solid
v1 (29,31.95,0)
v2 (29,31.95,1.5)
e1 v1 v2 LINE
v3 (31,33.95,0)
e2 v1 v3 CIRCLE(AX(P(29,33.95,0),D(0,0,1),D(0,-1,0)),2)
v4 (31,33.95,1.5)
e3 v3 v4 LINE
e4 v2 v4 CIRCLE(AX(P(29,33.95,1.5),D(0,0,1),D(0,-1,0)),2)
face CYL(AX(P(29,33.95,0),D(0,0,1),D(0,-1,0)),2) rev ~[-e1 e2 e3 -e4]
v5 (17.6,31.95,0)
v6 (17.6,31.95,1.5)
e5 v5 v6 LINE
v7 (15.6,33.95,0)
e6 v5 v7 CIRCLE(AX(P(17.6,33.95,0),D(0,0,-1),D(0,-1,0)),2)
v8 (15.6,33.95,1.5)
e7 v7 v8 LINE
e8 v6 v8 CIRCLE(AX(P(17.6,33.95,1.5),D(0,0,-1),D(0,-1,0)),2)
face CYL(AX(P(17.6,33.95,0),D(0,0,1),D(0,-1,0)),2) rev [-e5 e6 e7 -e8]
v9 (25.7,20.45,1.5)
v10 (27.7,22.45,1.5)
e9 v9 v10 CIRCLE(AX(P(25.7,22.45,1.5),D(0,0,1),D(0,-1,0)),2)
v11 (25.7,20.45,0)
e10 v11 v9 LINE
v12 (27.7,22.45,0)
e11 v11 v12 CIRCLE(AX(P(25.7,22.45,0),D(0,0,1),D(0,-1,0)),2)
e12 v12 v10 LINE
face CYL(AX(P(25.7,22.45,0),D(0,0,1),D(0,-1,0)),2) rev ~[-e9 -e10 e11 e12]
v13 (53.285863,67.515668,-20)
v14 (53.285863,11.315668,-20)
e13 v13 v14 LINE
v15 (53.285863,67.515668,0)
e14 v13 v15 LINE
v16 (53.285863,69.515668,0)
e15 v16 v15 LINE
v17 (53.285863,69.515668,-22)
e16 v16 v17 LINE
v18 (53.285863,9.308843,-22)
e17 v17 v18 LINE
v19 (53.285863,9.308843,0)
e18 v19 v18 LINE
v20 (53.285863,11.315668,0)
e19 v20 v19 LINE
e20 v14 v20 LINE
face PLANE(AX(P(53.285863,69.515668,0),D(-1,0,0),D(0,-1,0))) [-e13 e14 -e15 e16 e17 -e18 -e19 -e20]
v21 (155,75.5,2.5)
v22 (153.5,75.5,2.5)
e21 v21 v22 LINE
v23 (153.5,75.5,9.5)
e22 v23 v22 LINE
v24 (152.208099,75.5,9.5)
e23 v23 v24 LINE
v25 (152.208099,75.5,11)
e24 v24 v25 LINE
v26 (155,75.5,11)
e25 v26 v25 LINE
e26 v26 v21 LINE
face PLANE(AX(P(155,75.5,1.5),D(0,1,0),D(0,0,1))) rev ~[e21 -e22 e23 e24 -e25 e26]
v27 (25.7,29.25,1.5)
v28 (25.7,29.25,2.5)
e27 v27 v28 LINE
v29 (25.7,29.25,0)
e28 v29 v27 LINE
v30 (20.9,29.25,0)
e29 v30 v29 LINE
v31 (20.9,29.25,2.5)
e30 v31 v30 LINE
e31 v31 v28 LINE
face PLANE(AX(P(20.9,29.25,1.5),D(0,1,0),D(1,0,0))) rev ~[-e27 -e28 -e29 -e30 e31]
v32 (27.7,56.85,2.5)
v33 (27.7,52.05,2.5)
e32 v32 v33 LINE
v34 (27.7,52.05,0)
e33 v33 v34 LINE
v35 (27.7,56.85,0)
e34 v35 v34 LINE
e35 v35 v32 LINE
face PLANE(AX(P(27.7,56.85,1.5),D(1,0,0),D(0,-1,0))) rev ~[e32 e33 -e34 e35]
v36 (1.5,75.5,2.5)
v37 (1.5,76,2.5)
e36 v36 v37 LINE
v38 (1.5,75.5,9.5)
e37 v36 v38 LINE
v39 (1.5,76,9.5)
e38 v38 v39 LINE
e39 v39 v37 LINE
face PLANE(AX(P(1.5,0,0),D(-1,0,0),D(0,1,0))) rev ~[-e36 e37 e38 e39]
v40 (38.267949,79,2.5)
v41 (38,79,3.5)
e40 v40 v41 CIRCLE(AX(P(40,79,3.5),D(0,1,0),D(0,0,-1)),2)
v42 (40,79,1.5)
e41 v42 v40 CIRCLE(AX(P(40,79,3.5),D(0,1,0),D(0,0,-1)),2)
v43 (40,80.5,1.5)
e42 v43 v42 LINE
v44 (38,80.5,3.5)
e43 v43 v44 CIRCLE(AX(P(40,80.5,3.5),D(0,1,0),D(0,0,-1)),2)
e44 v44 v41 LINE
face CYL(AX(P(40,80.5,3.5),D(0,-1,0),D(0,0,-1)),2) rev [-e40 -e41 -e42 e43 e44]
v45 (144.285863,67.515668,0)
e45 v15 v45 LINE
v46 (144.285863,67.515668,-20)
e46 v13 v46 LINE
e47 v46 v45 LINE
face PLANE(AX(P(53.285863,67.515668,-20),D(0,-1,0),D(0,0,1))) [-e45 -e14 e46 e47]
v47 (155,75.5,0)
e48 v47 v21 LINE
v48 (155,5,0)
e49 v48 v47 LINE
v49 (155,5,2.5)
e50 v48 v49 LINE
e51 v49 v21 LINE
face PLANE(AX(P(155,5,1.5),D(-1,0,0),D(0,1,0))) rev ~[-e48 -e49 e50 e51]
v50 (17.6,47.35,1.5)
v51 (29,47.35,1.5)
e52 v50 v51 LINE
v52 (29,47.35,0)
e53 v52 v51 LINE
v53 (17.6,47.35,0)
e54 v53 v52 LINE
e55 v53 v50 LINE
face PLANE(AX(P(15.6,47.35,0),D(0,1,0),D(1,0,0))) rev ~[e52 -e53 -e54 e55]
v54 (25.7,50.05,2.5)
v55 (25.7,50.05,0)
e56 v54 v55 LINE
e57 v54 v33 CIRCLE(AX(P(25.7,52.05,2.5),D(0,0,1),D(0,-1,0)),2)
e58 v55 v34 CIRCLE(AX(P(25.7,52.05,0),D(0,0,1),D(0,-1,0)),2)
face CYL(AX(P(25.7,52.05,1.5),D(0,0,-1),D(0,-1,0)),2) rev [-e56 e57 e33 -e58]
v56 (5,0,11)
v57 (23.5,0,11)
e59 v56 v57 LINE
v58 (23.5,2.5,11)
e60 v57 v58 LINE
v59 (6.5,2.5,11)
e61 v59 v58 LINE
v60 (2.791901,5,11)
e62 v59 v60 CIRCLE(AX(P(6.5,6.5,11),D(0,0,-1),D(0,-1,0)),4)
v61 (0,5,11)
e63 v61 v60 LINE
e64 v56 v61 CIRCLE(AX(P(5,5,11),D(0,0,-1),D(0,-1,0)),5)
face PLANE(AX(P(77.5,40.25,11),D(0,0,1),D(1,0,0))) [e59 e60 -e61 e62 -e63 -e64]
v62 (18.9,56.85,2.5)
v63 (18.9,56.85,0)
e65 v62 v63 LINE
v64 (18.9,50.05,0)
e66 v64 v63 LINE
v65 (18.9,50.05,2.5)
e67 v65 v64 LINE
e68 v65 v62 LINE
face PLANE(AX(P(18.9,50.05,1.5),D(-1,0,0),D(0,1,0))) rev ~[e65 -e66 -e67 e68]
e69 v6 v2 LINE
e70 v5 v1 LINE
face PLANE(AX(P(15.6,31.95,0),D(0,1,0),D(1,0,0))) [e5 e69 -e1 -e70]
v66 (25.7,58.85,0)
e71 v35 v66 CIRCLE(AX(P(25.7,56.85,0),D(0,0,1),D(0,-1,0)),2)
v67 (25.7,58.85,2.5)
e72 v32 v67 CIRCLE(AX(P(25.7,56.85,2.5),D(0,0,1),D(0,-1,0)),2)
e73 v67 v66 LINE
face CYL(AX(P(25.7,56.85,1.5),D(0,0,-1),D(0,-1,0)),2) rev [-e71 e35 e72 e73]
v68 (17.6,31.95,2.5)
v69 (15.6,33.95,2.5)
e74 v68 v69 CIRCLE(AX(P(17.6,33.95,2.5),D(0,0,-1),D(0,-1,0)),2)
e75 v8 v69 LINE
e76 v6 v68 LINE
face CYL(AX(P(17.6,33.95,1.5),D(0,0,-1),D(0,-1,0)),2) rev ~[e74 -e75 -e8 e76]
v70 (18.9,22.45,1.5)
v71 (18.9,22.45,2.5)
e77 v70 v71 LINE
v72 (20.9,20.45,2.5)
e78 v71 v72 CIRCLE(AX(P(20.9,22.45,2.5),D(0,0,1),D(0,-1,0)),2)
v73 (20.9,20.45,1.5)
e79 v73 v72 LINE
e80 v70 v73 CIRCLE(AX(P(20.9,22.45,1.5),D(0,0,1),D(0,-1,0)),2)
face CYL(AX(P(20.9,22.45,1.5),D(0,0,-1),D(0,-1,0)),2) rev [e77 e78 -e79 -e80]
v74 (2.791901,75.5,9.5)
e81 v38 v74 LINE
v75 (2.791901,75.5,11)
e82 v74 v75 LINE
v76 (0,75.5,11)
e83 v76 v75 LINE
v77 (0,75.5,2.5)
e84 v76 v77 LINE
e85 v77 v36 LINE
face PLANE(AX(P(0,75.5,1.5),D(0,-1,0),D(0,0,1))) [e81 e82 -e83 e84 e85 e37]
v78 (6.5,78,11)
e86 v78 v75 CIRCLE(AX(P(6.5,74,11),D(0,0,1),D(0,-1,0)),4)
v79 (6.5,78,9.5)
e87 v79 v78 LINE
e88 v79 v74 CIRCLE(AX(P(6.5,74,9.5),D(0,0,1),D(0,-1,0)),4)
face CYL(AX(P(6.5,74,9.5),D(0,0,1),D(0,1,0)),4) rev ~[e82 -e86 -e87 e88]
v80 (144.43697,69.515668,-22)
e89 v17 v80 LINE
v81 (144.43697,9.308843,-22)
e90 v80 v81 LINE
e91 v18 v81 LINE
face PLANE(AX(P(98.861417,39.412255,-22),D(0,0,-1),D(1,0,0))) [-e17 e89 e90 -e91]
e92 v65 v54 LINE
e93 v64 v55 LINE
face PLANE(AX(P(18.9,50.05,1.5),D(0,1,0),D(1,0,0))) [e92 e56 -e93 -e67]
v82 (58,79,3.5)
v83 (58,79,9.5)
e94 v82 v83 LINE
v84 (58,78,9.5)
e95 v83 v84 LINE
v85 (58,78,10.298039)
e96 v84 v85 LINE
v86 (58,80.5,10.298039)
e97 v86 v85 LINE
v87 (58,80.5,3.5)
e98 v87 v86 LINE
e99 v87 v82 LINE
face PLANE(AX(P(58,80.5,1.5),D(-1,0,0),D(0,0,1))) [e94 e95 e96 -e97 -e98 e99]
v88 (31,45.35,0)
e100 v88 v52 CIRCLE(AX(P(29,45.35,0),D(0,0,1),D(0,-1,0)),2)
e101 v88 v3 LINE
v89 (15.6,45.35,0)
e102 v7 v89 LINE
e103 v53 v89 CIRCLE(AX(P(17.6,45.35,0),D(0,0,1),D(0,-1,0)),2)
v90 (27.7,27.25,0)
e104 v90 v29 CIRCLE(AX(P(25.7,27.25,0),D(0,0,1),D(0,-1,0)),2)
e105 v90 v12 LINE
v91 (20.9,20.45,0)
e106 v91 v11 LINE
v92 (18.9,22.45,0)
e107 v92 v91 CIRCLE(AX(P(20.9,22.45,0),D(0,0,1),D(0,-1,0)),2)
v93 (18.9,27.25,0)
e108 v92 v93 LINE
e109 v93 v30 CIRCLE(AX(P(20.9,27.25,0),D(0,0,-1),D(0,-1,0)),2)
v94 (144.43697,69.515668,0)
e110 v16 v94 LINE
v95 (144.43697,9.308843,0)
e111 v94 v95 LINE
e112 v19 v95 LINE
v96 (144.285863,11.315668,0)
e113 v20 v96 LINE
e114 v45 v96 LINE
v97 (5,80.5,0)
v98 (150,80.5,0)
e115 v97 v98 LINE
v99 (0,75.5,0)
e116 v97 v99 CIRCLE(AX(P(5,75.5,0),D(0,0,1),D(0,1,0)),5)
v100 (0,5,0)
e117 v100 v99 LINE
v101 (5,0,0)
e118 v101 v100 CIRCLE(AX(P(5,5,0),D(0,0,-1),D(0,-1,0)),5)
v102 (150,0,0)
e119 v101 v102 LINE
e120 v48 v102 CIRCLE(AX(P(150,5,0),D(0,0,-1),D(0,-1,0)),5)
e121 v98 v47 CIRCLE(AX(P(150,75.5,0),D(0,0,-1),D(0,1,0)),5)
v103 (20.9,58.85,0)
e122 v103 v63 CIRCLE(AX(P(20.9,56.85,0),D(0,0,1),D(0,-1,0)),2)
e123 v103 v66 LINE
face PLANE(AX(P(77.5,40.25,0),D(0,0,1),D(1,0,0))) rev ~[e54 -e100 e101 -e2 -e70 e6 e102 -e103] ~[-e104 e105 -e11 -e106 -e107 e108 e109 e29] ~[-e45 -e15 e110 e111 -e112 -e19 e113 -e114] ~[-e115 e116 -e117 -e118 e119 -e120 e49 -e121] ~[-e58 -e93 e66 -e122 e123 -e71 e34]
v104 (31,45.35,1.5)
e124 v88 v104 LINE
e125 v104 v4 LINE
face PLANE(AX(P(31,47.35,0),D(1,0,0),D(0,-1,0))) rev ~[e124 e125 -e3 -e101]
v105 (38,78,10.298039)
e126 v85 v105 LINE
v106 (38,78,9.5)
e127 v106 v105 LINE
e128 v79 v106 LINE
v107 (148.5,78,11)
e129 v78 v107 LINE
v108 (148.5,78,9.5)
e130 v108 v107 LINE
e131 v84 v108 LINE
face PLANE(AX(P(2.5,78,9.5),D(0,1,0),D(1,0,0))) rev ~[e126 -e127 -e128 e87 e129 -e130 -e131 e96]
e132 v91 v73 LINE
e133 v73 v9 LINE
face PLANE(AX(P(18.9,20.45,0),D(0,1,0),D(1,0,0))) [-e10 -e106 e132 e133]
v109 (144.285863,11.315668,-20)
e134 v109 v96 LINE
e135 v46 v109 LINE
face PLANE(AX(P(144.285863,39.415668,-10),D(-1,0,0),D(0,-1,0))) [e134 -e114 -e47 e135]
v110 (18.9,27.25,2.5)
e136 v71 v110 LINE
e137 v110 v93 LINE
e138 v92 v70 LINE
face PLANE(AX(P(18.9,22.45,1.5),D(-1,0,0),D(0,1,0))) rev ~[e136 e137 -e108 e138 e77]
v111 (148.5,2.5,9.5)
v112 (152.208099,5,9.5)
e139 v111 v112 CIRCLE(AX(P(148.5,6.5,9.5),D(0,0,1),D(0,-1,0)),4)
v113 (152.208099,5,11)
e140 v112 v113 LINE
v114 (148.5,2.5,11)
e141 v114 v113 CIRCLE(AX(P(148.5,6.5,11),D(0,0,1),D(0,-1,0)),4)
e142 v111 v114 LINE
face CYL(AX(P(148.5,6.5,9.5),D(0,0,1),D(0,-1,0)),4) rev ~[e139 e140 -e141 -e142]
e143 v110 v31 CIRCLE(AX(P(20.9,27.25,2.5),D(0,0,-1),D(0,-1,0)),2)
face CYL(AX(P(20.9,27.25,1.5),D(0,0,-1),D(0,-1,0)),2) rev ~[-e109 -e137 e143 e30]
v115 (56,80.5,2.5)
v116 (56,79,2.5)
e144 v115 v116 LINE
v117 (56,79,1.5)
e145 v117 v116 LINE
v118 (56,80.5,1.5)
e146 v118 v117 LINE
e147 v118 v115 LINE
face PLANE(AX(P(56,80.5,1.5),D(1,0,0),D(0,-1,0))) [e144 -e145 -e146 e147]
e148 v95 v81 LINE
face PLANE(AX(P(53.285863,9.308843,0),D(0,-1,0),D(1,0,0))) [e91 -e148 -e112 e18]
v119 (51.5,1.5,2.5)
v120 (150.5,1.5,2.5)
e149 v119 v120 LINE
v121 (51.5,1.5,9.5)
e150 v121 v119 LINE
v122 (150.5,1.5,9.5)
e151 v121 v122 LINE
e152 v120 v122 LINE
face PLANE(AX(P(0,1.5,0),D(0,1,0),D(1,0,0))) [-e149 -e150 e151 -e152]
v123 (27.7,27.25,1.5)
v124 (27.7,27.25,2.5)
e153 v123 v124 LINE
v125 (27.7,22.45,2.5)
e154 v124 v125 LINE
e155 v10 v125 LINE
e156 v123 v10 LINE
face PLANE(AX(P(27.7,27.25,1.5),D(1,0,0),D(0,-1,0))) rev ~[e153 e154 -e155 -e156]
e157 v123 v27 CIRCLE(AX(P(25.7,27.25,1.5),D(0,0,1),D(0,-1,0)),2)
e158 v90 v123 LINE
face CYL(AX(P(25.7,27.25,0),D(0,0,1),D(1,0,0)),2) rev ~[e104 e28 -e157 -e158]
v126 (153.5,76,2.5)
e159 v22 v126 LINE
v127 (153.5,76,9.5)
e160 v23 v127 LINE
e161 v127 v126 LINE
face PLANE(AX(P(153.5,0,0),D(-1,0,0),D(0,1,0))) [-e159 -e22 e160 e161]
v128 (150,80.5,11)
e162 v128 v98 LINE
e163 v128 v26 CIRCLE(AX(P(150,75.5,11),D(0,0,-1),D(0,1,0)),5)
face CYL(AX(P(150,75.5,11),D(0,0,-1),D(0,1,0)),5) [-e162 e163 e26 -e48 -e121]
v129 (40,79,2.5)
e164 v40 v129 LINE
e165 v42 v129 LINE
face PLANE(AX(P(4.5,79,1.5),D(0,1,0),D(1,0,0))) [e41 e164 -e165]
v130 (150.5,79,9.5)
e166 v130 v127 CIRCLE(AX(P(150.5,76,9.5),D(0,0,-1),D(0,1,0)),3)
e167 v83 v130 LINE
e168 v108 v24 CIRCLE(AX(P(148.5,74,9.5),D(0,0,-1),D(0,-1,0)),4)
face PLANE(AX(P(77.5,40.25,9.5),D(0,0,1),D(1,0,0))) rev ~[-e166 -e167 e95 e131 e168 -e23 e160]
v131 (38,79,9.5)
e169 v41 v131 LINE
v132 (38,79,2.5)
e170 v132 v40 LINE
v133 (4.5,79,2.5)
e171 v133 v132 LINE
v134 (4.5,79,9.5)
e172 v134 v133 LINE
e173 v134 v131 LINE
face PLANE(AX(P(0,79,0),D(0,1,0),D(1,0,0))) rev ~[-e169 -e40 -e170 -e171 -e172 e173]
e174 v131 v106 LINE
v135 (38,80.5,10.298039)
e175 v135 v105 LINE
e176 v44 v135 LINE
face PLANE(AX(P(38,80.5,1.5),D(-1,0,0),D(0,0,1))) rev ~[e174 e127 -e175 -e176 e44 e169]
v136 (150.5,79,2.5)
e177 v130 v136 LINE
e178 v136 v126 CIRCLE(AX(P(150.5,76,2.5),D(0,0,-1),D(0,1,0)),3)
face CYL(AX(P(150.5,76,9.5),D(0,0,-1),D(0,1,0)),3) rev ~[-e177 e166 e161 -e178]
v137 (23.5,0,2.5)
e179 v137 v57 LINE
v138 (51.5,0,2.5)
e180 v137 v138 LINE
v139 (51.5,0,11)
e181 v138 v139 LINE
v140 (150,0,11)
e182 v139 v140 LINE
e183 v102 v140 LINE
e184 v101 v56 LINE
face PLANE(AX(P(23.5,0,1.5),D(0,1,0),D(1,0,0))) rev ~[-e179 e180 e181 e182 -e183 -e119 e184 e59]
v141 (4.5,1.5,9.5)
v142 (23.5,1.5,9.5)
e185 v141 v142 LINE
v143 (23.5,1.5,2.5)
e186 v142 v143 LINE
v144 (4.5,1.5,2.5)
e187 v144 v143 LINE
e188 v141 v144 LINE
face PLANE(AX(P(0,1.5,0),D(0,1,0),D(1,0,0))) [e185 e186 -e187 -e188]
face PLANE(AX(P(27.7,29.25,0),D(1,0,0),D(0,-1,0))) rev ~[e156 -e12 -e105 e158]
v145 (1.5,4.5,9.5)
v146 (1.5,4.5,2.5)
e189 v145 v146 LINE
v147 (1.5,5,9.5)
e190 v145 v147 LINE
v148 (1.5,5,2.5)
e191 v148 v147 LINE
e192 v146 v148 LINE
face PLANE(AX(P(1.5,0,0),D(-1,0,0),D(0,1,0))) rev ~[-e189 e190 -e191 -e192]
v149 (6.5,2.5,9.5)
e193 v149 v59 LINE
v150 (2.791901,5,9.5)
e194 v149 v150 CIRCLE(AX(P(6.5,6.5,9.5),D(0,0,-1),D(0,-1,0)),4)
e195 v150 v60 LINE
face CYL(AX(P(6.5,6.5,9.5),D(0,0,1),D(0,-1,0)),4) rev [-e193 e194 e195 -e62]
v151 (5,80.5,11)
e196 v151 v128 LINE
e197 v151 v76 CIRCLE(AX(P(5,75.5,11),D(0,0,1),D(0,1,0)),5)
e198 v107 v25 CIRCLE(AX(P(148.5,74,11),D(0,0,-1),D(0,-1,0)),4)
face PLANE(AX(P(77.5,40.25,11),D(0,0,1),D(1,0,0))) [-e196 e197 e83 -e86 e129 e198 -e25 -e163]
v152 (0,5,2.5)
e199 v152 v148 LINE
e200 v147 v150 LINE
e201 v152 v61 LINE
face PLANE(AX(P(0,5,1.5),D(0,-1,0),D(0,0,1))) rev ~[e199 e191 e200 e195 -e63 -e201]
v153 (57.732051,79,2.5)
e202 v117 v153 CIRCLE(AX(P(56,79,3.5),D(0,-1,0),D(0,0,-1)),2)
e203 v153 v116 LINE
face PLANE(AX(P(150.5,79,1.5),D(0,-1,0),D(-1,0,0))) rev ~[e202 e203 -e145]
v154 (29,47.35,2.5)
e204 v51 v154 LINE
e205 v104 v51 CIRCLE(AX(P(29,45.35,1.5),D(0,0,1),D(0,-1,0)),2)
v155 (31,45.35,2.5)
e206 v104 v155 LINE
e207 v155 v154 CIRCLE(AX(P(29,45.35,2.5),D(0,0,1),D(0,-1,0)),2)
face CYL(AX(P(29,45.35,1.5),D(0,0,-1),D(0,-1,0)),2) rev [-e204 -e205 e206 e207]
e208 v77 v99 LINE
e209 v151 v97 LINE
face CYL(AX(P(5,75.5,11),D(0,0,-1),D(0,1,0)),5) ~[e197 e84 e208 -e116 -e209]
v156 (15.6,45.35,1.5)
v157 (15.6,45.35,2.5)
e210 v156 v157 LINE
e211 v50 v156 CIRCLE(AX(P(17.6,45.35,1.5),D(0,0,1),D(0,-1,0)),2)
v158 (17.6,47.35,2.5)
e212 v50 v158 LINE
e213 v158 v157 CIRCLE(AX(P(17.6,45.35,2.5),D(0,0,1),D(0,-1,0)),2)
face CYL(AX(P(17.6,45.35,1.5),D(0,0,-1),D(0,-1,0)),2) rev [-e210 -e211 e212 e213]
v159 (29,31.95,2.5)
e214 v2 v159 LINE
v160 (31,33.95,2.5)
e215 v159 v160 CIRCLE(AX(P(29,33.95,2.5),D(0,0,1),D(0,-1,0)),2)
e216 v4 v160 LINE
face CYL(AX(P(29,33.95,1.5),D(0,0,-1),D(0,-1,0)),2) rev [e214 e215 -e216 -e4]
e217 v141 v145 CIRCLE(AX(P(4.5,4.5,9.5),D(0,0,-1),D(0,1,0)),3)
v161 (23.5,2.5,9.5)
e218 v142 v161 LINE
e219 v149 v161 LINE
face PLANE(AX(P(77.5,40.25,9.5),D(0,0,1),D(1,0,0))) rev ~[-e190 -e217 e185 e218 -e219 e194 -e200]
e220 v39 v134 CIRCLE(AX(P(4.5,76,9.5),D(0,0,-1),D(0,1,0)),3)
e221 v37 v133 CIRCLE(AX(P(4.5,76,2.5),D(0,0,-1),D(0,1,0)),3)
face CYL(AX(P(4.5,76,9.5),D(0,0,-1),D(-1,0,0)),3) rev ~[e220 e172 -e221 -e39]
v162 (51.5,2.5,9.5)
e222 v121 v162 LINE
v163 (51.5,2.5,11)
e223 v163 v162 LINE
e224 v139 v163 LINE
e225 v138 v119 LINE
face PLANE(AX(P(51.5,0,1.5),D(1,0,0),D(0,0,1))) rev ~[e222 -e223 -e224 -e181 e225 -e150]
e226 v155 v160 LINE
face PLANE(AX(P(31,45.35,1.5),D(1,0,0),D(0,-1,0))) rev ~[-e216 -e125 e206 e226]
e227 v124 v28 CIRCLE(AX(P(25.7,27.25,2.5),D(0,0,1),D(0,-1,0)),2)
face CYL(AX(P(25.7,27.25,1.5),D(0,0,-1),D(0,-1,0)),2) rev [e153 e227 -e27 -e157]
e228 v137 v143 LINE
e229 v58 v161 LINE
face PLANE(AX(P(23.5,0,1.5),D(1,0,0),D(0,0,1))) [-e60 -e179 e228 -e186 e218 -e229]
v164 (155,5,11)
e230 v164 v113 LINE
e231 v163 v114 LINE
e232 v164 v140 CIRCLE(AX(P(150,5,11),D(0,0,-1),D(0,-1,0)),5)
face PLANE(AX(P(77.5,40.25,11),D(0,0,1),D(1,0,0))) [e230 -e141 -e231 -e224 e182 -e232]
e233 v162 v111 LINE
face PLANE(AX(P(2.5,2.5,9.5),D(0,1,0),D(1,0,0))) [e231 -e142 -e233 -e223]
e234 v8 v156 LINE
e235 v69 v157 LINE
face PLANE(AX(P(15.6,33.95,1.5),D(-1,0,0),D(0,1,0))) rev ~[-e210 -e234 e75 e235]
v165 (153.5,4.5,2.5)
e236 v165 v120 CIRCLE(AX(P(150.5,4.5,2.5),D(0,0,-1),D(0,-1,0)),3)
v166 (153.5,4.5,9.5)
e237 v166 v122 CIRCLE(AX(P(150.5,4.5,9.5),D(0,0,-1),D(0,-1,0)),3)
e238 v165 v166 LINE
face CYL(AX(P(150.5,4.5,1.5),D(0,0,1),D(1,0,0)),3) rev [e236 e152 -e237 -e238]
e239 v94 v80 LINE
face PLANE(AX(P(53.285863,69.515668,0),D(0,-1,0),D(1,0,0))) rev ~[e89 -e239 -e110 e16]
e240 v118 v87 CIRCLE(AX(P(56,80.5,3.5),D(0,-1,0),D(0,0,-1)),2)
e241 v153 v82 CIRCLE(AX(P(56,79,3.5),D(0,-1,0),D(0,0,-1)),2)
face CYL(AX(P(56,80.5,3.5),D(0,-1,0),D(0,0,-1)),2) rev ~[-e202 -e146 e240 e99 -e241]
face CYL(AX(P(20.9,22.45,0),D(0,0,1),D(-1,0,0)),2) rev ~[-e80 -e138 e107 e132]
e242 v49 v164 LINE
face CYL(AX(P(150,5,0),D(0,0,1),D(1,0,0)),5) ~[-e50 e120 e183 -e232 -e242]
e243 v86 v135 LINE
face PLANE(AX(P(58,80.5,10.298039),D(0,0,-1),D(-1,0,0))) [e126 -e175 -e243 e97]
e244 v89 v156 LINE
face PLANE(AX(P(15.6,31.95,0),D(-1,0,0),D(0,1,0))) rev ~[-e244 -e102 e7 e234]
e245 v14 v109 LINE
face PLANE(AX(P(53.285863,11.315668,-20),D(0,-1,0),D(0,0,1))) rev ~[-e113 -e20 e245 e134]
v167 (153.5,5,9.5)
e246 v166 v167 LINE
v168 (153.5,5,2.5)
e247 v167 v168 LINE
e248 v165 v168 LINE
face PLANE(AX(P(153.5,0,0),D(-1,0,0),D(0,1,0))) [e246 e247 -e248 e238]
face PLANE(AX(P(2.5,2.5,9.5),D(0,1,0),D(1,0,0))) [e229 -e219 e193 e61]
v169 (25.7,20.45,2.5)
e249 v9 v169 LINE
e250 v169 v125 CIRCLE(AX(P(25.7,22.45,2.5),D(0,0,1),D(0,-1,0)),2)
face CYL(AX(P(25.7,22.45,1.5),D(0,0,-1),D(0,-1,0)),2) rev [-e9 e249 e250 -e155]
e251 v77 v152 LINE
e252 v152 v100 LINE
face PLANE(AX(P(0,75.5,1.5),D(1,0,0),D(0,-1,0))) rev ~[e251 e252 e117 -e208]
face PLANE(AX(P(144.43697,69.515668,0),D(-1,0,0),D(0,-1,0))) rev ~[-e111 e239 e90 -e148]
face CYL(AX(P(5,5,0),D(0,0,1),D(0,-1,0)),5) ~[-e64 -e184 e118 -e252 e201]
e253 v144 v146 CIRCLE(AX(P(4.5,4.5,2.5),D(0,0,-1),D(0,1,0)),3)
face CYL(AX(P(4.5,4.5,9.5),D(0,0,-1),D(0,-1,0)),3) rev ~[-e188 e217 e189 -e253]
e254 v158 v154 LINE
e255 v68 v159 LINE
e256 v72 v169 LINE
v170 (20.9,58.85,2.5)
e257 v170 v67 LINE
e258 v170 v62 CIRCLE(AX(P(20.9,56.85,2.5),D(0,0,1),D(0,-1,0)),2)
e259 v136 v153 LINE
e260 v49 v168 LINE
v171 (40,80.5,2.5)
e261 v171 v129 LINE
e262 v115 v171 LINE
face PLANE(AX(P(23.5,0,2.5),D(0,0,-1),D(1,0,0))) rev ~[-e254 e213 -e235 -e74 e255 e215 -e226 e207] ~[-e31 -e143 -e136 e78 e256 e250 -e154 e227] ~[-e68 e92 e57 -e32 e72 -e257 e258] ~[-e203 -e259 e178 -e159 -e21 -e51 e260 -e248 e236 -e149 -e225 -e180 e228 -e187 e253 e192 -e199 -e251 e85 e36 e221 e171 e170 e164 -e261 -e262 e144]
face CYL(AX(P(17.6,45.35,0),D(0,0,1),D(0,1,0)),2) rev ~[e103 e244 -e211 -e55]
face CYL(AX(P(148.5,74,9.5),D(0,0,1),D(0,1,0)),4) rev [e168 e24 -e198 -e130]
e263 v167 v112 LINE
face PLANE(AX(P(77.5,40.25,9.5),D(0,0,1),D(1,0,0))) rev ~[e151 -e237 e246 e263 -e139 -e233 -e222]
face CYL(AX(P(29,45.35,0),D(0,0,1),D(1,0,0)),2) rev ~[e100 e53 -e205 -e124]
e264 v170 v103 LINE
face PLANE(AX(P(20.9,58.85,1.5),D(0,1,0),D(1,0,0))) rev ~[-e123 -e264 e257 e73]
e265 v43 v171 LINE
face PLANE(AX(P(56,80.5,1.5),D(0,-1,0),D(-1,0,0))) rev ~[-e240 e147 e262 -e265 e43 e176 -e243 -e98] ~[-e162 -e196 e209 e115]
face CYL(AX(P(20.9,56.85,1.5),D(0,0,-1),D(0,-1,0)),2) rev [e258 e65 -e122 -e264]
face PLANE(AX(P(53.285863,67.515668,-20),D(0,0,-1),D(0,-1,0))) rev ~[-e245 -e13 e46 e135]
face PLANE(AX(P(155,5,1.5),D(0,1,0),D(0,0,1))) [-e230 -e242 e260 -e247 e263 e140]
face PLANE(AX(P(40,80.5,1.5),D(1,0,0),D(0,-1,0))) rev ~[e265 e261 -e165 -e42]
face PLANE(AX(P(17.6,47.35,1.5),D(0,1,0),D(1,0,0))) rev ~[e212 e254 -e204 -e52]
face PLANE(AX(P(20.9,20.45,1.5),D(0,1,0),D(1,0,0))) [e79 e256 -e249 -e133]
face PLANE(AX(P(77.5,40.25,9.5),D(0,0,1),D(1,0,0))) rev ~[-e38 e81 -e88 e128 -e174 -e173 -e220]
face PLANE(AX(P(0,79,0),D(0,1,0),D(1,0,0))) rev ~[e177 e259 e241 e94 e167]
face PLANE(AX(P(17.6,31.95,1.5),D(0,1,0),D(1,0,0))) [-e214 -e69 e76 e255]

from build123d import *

# Parameters (mm, degrees)
F0_W      = 155
F0_H      = 80.5
F1_DEPTH  = 9.5
F2_T      = -1.5
F3_W      = 155
F3_H      = 80.5
F3_W_2    = 152
F3_H_2    = 77.5
F3_W_3    = 150
F3_H_3    = 75.5
F4_DEPTH  = 1.5
F5_W      = 20
F5_H      = 8.7980394721
F6_DEPTH  = 2.501
F7_W      = 8.8
F7_H      = 4.4
F7_W_2    = 15.4
F7_H_2    = 7.7
F8_DEPTH  = 1.5
F9_R      = 2
F10_R     = 5
F11_R     = 3
F12_F1_R  = 4
F12_F2_R  = 4
F12_F3_R  = 4
F12_F4_R  = 4
F13_W     = 70.5
F13_H     = 9.5
F14_DEPTH = 2.7929007565
F15_W     = 70.5
F15_H     = 9.5
F16_DEPTH = 2.7929007565
F17_W     = 28
F17_H     = 9.5
F18_DEPTH = 2.501
F19_DEPTH = 1
F20_W     = 91.1511071026
F20_H     = 60.2068249136
F21_DEPTH = 22
F22_W     = 56.2
F22_H     = 20
F23_DEPTH = 91


with BuildPart() as f1:
    # F0 (on Top) → F1 (new body)
    with BuildSketch(Plane.XY):
        with Locations((77.5, 40.25)):
            Rectangle(F0_W, F0_H)
    extrude(amount=F1_DEPTH)

    # F2
    f2_openings = [f1.faces().sort_by_distance(p)[0] for p in [
        (77.5, 40.25, 9.5),
    ]]
    offset(amount=F2_T, openings=f2_openings)

    # F3 (on face) → F4 (join)
    with BuildSketch(Plane.XY.offset(9.5)):
        with Locations((77.5, 40.25)):
            Rectangle(F3_W, F3_H)
        with Locations((77.5, 40.25)):
            Rectangle(F3_W_2, F3_H_2, mode=Mode.SUBTRACT)
        with Locations((77.5, 40.25)):
            Rectangle(F3_W_2, F3_H_2)
        with Locations((77.5, 40.25)):
            Rectangle(F3_W_3, F3_H_3, mode=Mode.SUBTRACT)
    extrude(amount=F4_DEPTH)

    # F5 (on face) → F6 (cut, through all)
    with BuildSketch(Plane(origin=(0, 80.5, 0), x_dir=(-1, 0, 0), z_dir=(0, 1, 0))):
        with Locations((-48, 5.8990197361)):
            Rectangle(F5_W, F5_H)
    extrude(amount=-F6_DEPTH, mode=Mode.SUBTRACT)

    # F7 (on face) → F8 (cut, through all)
    with BuildSketch(Plane(origin=(0, 0, 0), x_dir=(1, 0, 0), z_dir=(0, 0, -1))):
        with Locations((23.3, -27.05)):
            Rectangle(F7_W, F7_H)
        with Locations((23.3, -22.65)):
            Rectangle(F7_W, F7_H)
        with Locations((23.3, -35.8)):
            Rectangle(F7_W_2, F7_H_2)
        with Locations((23.3, -43.5)):
            Rectangle(F7_W_2, F7_H_2)
        with Locations((23.3, -52.25)):
            Rectangle(F7_W, F7_H)
        with Locations((23.3, -56.65)):
            Rectangle(F7_W, F7_H)
    extrude(amount=-F8_DEPTH, mode=Mode.SUBTRACT)

    # F9
    f9_edges = [f1.edges().sort_by_distance(p)[0] for p in [
        (18.9, 29.25, 0.75),
        (15.6, 47.35, 0.75),
        (18.9, 58.85, 0.75),
        (18.9, 20.45, 0.75),
        (15.6, 31.95, 0.75),
        (27.7, 50.05, 0.75),
        (31, 31.95, 0.75),
        (27.7, 20.45, 0.75),
        (27.7, 29.25, 0.75),
        (31, 47.35, 0.75),
        (27.7, 58.85, 0.75),
        (58, 79.75, 1.5),
        (38, 79.75, 1.5),
    ]]
    fillet(f9_edges, radius=F9_R)

    # F10
    f10_edges = [f1.edges().sort_by_distance(p)[0] for p in [
        (0, 0, 5.5),
        (0, 80.5, 5.5),
        (155, 0, 5.5),
        (155, 80.5, 5.5),
    ]]
    fillet(f10_edges, radius=F10_R)

    # F11
    f11_edges = [f1.edges().sort_by_distance(p)[0] for p in [
        (1.5, 79, 5.5),
        (1.5, 1.5, 5.5),
        (153.5, 79, 5.5),
        (153.5, 1.5, 5.5),
    ]]
    fillet(f11_edges, radius=F11_R)

    # F12: fillet of radius 4 on 4 edges, made by hand

    # F12_f1
    f12_f1_edges = [f1.edges().sort_by_distance(p)[0] for p in [
        (152.5, 78, 10.25),
    ]]
    fillet(f12_f1_edges, radius=F12_F1_R)

    # F12_f2
    f12_f2_edges = [f1.edges().sort_by_distance(p)[0] for p in [
        (2.5, 78, 10.25),
    ]]
    fillet(f12_f2_edges, radius=F12_F2_R)

    # F12_f3
    f12_f3_edges = [f1.edges().sort_by_distance(p)[0] for p in [
        (152.5, 2.5, 10.25),
    ]]
    fillet(f12_f3_edges, radius=F12_F3_R)

    # F12_f4
    f12_f4_edges = [f1.edges().sort_by_distance(p)[0] for p in [
        (2.5, 2.5, 10.25),
    ]]
    fillet(f12_f4_edges, radius=F12_F4_R)

    # F13 (on face) → F14 (cut, through all)
    with BuildSketch(Plane(origin=(0, 0, 0), x_dir=(0, -1, 0), z_dir=(-1, 0, 0))):
        with Locations((-40.25, 6.25)):
            Rectangle(F13_W, F13_H)
    extrude(amount=-F14_DEPTH, mode=Mode.SUBTRACT)

    # F15 (on face) → F16 (cut, through all)
    with BuildSketch(Plane.YZ.offset(155)):
        with Locations((40.25, 6.25)):
            Rectangle(F15_W, F15_H)
    extrude(amount=-F16_DEPTH, mode=Mode.SUBTRACT)

    # F17 (on face) → F18 (cut, through all)
    with BuildSketch(Plane.XZ):
        with Locations((37.5, 6.25)):
            Rectangle(F17_W, F17_H)
    extrude(amount=-F18_DEPTH, mode=Mode.SUBTRACT)

    # F19 (add): a face of the model
    f19_faces = [f1.faces().sort_by_distance(p)[0] for p in [
        (79.0729751372, 40.2079373473, 1.5),
    ]]
    extrude(f19_faces, amount=F19_DEPTH)

    # F20 (on face) → F21 (join)
    with BuildSketch(Plane(origin=(0, 0, 0), x_dir=(1, 0, 0), z_dir=(0, 0, -1))):
        with Locations((98.8614168018, -39.4122553989)):
            Rectangle(F20_W, F20_H)
    extrude(amount=F21_DEPTH)

    # F22 (on face) → F23 (cut)
    with BuildSketch(Plane(origin=(53.2858632505, 0, 0), x_dir=(0, -1, 0), z_dir=(-1, 0, 0))):
        with Locations((-39.4156678557, -10)):
            Rectangle(F22_W, F22_H)
    extrude(amount=-F23_DEPTH, mode=Mode.SUBTRACT)


solid = f1.part
